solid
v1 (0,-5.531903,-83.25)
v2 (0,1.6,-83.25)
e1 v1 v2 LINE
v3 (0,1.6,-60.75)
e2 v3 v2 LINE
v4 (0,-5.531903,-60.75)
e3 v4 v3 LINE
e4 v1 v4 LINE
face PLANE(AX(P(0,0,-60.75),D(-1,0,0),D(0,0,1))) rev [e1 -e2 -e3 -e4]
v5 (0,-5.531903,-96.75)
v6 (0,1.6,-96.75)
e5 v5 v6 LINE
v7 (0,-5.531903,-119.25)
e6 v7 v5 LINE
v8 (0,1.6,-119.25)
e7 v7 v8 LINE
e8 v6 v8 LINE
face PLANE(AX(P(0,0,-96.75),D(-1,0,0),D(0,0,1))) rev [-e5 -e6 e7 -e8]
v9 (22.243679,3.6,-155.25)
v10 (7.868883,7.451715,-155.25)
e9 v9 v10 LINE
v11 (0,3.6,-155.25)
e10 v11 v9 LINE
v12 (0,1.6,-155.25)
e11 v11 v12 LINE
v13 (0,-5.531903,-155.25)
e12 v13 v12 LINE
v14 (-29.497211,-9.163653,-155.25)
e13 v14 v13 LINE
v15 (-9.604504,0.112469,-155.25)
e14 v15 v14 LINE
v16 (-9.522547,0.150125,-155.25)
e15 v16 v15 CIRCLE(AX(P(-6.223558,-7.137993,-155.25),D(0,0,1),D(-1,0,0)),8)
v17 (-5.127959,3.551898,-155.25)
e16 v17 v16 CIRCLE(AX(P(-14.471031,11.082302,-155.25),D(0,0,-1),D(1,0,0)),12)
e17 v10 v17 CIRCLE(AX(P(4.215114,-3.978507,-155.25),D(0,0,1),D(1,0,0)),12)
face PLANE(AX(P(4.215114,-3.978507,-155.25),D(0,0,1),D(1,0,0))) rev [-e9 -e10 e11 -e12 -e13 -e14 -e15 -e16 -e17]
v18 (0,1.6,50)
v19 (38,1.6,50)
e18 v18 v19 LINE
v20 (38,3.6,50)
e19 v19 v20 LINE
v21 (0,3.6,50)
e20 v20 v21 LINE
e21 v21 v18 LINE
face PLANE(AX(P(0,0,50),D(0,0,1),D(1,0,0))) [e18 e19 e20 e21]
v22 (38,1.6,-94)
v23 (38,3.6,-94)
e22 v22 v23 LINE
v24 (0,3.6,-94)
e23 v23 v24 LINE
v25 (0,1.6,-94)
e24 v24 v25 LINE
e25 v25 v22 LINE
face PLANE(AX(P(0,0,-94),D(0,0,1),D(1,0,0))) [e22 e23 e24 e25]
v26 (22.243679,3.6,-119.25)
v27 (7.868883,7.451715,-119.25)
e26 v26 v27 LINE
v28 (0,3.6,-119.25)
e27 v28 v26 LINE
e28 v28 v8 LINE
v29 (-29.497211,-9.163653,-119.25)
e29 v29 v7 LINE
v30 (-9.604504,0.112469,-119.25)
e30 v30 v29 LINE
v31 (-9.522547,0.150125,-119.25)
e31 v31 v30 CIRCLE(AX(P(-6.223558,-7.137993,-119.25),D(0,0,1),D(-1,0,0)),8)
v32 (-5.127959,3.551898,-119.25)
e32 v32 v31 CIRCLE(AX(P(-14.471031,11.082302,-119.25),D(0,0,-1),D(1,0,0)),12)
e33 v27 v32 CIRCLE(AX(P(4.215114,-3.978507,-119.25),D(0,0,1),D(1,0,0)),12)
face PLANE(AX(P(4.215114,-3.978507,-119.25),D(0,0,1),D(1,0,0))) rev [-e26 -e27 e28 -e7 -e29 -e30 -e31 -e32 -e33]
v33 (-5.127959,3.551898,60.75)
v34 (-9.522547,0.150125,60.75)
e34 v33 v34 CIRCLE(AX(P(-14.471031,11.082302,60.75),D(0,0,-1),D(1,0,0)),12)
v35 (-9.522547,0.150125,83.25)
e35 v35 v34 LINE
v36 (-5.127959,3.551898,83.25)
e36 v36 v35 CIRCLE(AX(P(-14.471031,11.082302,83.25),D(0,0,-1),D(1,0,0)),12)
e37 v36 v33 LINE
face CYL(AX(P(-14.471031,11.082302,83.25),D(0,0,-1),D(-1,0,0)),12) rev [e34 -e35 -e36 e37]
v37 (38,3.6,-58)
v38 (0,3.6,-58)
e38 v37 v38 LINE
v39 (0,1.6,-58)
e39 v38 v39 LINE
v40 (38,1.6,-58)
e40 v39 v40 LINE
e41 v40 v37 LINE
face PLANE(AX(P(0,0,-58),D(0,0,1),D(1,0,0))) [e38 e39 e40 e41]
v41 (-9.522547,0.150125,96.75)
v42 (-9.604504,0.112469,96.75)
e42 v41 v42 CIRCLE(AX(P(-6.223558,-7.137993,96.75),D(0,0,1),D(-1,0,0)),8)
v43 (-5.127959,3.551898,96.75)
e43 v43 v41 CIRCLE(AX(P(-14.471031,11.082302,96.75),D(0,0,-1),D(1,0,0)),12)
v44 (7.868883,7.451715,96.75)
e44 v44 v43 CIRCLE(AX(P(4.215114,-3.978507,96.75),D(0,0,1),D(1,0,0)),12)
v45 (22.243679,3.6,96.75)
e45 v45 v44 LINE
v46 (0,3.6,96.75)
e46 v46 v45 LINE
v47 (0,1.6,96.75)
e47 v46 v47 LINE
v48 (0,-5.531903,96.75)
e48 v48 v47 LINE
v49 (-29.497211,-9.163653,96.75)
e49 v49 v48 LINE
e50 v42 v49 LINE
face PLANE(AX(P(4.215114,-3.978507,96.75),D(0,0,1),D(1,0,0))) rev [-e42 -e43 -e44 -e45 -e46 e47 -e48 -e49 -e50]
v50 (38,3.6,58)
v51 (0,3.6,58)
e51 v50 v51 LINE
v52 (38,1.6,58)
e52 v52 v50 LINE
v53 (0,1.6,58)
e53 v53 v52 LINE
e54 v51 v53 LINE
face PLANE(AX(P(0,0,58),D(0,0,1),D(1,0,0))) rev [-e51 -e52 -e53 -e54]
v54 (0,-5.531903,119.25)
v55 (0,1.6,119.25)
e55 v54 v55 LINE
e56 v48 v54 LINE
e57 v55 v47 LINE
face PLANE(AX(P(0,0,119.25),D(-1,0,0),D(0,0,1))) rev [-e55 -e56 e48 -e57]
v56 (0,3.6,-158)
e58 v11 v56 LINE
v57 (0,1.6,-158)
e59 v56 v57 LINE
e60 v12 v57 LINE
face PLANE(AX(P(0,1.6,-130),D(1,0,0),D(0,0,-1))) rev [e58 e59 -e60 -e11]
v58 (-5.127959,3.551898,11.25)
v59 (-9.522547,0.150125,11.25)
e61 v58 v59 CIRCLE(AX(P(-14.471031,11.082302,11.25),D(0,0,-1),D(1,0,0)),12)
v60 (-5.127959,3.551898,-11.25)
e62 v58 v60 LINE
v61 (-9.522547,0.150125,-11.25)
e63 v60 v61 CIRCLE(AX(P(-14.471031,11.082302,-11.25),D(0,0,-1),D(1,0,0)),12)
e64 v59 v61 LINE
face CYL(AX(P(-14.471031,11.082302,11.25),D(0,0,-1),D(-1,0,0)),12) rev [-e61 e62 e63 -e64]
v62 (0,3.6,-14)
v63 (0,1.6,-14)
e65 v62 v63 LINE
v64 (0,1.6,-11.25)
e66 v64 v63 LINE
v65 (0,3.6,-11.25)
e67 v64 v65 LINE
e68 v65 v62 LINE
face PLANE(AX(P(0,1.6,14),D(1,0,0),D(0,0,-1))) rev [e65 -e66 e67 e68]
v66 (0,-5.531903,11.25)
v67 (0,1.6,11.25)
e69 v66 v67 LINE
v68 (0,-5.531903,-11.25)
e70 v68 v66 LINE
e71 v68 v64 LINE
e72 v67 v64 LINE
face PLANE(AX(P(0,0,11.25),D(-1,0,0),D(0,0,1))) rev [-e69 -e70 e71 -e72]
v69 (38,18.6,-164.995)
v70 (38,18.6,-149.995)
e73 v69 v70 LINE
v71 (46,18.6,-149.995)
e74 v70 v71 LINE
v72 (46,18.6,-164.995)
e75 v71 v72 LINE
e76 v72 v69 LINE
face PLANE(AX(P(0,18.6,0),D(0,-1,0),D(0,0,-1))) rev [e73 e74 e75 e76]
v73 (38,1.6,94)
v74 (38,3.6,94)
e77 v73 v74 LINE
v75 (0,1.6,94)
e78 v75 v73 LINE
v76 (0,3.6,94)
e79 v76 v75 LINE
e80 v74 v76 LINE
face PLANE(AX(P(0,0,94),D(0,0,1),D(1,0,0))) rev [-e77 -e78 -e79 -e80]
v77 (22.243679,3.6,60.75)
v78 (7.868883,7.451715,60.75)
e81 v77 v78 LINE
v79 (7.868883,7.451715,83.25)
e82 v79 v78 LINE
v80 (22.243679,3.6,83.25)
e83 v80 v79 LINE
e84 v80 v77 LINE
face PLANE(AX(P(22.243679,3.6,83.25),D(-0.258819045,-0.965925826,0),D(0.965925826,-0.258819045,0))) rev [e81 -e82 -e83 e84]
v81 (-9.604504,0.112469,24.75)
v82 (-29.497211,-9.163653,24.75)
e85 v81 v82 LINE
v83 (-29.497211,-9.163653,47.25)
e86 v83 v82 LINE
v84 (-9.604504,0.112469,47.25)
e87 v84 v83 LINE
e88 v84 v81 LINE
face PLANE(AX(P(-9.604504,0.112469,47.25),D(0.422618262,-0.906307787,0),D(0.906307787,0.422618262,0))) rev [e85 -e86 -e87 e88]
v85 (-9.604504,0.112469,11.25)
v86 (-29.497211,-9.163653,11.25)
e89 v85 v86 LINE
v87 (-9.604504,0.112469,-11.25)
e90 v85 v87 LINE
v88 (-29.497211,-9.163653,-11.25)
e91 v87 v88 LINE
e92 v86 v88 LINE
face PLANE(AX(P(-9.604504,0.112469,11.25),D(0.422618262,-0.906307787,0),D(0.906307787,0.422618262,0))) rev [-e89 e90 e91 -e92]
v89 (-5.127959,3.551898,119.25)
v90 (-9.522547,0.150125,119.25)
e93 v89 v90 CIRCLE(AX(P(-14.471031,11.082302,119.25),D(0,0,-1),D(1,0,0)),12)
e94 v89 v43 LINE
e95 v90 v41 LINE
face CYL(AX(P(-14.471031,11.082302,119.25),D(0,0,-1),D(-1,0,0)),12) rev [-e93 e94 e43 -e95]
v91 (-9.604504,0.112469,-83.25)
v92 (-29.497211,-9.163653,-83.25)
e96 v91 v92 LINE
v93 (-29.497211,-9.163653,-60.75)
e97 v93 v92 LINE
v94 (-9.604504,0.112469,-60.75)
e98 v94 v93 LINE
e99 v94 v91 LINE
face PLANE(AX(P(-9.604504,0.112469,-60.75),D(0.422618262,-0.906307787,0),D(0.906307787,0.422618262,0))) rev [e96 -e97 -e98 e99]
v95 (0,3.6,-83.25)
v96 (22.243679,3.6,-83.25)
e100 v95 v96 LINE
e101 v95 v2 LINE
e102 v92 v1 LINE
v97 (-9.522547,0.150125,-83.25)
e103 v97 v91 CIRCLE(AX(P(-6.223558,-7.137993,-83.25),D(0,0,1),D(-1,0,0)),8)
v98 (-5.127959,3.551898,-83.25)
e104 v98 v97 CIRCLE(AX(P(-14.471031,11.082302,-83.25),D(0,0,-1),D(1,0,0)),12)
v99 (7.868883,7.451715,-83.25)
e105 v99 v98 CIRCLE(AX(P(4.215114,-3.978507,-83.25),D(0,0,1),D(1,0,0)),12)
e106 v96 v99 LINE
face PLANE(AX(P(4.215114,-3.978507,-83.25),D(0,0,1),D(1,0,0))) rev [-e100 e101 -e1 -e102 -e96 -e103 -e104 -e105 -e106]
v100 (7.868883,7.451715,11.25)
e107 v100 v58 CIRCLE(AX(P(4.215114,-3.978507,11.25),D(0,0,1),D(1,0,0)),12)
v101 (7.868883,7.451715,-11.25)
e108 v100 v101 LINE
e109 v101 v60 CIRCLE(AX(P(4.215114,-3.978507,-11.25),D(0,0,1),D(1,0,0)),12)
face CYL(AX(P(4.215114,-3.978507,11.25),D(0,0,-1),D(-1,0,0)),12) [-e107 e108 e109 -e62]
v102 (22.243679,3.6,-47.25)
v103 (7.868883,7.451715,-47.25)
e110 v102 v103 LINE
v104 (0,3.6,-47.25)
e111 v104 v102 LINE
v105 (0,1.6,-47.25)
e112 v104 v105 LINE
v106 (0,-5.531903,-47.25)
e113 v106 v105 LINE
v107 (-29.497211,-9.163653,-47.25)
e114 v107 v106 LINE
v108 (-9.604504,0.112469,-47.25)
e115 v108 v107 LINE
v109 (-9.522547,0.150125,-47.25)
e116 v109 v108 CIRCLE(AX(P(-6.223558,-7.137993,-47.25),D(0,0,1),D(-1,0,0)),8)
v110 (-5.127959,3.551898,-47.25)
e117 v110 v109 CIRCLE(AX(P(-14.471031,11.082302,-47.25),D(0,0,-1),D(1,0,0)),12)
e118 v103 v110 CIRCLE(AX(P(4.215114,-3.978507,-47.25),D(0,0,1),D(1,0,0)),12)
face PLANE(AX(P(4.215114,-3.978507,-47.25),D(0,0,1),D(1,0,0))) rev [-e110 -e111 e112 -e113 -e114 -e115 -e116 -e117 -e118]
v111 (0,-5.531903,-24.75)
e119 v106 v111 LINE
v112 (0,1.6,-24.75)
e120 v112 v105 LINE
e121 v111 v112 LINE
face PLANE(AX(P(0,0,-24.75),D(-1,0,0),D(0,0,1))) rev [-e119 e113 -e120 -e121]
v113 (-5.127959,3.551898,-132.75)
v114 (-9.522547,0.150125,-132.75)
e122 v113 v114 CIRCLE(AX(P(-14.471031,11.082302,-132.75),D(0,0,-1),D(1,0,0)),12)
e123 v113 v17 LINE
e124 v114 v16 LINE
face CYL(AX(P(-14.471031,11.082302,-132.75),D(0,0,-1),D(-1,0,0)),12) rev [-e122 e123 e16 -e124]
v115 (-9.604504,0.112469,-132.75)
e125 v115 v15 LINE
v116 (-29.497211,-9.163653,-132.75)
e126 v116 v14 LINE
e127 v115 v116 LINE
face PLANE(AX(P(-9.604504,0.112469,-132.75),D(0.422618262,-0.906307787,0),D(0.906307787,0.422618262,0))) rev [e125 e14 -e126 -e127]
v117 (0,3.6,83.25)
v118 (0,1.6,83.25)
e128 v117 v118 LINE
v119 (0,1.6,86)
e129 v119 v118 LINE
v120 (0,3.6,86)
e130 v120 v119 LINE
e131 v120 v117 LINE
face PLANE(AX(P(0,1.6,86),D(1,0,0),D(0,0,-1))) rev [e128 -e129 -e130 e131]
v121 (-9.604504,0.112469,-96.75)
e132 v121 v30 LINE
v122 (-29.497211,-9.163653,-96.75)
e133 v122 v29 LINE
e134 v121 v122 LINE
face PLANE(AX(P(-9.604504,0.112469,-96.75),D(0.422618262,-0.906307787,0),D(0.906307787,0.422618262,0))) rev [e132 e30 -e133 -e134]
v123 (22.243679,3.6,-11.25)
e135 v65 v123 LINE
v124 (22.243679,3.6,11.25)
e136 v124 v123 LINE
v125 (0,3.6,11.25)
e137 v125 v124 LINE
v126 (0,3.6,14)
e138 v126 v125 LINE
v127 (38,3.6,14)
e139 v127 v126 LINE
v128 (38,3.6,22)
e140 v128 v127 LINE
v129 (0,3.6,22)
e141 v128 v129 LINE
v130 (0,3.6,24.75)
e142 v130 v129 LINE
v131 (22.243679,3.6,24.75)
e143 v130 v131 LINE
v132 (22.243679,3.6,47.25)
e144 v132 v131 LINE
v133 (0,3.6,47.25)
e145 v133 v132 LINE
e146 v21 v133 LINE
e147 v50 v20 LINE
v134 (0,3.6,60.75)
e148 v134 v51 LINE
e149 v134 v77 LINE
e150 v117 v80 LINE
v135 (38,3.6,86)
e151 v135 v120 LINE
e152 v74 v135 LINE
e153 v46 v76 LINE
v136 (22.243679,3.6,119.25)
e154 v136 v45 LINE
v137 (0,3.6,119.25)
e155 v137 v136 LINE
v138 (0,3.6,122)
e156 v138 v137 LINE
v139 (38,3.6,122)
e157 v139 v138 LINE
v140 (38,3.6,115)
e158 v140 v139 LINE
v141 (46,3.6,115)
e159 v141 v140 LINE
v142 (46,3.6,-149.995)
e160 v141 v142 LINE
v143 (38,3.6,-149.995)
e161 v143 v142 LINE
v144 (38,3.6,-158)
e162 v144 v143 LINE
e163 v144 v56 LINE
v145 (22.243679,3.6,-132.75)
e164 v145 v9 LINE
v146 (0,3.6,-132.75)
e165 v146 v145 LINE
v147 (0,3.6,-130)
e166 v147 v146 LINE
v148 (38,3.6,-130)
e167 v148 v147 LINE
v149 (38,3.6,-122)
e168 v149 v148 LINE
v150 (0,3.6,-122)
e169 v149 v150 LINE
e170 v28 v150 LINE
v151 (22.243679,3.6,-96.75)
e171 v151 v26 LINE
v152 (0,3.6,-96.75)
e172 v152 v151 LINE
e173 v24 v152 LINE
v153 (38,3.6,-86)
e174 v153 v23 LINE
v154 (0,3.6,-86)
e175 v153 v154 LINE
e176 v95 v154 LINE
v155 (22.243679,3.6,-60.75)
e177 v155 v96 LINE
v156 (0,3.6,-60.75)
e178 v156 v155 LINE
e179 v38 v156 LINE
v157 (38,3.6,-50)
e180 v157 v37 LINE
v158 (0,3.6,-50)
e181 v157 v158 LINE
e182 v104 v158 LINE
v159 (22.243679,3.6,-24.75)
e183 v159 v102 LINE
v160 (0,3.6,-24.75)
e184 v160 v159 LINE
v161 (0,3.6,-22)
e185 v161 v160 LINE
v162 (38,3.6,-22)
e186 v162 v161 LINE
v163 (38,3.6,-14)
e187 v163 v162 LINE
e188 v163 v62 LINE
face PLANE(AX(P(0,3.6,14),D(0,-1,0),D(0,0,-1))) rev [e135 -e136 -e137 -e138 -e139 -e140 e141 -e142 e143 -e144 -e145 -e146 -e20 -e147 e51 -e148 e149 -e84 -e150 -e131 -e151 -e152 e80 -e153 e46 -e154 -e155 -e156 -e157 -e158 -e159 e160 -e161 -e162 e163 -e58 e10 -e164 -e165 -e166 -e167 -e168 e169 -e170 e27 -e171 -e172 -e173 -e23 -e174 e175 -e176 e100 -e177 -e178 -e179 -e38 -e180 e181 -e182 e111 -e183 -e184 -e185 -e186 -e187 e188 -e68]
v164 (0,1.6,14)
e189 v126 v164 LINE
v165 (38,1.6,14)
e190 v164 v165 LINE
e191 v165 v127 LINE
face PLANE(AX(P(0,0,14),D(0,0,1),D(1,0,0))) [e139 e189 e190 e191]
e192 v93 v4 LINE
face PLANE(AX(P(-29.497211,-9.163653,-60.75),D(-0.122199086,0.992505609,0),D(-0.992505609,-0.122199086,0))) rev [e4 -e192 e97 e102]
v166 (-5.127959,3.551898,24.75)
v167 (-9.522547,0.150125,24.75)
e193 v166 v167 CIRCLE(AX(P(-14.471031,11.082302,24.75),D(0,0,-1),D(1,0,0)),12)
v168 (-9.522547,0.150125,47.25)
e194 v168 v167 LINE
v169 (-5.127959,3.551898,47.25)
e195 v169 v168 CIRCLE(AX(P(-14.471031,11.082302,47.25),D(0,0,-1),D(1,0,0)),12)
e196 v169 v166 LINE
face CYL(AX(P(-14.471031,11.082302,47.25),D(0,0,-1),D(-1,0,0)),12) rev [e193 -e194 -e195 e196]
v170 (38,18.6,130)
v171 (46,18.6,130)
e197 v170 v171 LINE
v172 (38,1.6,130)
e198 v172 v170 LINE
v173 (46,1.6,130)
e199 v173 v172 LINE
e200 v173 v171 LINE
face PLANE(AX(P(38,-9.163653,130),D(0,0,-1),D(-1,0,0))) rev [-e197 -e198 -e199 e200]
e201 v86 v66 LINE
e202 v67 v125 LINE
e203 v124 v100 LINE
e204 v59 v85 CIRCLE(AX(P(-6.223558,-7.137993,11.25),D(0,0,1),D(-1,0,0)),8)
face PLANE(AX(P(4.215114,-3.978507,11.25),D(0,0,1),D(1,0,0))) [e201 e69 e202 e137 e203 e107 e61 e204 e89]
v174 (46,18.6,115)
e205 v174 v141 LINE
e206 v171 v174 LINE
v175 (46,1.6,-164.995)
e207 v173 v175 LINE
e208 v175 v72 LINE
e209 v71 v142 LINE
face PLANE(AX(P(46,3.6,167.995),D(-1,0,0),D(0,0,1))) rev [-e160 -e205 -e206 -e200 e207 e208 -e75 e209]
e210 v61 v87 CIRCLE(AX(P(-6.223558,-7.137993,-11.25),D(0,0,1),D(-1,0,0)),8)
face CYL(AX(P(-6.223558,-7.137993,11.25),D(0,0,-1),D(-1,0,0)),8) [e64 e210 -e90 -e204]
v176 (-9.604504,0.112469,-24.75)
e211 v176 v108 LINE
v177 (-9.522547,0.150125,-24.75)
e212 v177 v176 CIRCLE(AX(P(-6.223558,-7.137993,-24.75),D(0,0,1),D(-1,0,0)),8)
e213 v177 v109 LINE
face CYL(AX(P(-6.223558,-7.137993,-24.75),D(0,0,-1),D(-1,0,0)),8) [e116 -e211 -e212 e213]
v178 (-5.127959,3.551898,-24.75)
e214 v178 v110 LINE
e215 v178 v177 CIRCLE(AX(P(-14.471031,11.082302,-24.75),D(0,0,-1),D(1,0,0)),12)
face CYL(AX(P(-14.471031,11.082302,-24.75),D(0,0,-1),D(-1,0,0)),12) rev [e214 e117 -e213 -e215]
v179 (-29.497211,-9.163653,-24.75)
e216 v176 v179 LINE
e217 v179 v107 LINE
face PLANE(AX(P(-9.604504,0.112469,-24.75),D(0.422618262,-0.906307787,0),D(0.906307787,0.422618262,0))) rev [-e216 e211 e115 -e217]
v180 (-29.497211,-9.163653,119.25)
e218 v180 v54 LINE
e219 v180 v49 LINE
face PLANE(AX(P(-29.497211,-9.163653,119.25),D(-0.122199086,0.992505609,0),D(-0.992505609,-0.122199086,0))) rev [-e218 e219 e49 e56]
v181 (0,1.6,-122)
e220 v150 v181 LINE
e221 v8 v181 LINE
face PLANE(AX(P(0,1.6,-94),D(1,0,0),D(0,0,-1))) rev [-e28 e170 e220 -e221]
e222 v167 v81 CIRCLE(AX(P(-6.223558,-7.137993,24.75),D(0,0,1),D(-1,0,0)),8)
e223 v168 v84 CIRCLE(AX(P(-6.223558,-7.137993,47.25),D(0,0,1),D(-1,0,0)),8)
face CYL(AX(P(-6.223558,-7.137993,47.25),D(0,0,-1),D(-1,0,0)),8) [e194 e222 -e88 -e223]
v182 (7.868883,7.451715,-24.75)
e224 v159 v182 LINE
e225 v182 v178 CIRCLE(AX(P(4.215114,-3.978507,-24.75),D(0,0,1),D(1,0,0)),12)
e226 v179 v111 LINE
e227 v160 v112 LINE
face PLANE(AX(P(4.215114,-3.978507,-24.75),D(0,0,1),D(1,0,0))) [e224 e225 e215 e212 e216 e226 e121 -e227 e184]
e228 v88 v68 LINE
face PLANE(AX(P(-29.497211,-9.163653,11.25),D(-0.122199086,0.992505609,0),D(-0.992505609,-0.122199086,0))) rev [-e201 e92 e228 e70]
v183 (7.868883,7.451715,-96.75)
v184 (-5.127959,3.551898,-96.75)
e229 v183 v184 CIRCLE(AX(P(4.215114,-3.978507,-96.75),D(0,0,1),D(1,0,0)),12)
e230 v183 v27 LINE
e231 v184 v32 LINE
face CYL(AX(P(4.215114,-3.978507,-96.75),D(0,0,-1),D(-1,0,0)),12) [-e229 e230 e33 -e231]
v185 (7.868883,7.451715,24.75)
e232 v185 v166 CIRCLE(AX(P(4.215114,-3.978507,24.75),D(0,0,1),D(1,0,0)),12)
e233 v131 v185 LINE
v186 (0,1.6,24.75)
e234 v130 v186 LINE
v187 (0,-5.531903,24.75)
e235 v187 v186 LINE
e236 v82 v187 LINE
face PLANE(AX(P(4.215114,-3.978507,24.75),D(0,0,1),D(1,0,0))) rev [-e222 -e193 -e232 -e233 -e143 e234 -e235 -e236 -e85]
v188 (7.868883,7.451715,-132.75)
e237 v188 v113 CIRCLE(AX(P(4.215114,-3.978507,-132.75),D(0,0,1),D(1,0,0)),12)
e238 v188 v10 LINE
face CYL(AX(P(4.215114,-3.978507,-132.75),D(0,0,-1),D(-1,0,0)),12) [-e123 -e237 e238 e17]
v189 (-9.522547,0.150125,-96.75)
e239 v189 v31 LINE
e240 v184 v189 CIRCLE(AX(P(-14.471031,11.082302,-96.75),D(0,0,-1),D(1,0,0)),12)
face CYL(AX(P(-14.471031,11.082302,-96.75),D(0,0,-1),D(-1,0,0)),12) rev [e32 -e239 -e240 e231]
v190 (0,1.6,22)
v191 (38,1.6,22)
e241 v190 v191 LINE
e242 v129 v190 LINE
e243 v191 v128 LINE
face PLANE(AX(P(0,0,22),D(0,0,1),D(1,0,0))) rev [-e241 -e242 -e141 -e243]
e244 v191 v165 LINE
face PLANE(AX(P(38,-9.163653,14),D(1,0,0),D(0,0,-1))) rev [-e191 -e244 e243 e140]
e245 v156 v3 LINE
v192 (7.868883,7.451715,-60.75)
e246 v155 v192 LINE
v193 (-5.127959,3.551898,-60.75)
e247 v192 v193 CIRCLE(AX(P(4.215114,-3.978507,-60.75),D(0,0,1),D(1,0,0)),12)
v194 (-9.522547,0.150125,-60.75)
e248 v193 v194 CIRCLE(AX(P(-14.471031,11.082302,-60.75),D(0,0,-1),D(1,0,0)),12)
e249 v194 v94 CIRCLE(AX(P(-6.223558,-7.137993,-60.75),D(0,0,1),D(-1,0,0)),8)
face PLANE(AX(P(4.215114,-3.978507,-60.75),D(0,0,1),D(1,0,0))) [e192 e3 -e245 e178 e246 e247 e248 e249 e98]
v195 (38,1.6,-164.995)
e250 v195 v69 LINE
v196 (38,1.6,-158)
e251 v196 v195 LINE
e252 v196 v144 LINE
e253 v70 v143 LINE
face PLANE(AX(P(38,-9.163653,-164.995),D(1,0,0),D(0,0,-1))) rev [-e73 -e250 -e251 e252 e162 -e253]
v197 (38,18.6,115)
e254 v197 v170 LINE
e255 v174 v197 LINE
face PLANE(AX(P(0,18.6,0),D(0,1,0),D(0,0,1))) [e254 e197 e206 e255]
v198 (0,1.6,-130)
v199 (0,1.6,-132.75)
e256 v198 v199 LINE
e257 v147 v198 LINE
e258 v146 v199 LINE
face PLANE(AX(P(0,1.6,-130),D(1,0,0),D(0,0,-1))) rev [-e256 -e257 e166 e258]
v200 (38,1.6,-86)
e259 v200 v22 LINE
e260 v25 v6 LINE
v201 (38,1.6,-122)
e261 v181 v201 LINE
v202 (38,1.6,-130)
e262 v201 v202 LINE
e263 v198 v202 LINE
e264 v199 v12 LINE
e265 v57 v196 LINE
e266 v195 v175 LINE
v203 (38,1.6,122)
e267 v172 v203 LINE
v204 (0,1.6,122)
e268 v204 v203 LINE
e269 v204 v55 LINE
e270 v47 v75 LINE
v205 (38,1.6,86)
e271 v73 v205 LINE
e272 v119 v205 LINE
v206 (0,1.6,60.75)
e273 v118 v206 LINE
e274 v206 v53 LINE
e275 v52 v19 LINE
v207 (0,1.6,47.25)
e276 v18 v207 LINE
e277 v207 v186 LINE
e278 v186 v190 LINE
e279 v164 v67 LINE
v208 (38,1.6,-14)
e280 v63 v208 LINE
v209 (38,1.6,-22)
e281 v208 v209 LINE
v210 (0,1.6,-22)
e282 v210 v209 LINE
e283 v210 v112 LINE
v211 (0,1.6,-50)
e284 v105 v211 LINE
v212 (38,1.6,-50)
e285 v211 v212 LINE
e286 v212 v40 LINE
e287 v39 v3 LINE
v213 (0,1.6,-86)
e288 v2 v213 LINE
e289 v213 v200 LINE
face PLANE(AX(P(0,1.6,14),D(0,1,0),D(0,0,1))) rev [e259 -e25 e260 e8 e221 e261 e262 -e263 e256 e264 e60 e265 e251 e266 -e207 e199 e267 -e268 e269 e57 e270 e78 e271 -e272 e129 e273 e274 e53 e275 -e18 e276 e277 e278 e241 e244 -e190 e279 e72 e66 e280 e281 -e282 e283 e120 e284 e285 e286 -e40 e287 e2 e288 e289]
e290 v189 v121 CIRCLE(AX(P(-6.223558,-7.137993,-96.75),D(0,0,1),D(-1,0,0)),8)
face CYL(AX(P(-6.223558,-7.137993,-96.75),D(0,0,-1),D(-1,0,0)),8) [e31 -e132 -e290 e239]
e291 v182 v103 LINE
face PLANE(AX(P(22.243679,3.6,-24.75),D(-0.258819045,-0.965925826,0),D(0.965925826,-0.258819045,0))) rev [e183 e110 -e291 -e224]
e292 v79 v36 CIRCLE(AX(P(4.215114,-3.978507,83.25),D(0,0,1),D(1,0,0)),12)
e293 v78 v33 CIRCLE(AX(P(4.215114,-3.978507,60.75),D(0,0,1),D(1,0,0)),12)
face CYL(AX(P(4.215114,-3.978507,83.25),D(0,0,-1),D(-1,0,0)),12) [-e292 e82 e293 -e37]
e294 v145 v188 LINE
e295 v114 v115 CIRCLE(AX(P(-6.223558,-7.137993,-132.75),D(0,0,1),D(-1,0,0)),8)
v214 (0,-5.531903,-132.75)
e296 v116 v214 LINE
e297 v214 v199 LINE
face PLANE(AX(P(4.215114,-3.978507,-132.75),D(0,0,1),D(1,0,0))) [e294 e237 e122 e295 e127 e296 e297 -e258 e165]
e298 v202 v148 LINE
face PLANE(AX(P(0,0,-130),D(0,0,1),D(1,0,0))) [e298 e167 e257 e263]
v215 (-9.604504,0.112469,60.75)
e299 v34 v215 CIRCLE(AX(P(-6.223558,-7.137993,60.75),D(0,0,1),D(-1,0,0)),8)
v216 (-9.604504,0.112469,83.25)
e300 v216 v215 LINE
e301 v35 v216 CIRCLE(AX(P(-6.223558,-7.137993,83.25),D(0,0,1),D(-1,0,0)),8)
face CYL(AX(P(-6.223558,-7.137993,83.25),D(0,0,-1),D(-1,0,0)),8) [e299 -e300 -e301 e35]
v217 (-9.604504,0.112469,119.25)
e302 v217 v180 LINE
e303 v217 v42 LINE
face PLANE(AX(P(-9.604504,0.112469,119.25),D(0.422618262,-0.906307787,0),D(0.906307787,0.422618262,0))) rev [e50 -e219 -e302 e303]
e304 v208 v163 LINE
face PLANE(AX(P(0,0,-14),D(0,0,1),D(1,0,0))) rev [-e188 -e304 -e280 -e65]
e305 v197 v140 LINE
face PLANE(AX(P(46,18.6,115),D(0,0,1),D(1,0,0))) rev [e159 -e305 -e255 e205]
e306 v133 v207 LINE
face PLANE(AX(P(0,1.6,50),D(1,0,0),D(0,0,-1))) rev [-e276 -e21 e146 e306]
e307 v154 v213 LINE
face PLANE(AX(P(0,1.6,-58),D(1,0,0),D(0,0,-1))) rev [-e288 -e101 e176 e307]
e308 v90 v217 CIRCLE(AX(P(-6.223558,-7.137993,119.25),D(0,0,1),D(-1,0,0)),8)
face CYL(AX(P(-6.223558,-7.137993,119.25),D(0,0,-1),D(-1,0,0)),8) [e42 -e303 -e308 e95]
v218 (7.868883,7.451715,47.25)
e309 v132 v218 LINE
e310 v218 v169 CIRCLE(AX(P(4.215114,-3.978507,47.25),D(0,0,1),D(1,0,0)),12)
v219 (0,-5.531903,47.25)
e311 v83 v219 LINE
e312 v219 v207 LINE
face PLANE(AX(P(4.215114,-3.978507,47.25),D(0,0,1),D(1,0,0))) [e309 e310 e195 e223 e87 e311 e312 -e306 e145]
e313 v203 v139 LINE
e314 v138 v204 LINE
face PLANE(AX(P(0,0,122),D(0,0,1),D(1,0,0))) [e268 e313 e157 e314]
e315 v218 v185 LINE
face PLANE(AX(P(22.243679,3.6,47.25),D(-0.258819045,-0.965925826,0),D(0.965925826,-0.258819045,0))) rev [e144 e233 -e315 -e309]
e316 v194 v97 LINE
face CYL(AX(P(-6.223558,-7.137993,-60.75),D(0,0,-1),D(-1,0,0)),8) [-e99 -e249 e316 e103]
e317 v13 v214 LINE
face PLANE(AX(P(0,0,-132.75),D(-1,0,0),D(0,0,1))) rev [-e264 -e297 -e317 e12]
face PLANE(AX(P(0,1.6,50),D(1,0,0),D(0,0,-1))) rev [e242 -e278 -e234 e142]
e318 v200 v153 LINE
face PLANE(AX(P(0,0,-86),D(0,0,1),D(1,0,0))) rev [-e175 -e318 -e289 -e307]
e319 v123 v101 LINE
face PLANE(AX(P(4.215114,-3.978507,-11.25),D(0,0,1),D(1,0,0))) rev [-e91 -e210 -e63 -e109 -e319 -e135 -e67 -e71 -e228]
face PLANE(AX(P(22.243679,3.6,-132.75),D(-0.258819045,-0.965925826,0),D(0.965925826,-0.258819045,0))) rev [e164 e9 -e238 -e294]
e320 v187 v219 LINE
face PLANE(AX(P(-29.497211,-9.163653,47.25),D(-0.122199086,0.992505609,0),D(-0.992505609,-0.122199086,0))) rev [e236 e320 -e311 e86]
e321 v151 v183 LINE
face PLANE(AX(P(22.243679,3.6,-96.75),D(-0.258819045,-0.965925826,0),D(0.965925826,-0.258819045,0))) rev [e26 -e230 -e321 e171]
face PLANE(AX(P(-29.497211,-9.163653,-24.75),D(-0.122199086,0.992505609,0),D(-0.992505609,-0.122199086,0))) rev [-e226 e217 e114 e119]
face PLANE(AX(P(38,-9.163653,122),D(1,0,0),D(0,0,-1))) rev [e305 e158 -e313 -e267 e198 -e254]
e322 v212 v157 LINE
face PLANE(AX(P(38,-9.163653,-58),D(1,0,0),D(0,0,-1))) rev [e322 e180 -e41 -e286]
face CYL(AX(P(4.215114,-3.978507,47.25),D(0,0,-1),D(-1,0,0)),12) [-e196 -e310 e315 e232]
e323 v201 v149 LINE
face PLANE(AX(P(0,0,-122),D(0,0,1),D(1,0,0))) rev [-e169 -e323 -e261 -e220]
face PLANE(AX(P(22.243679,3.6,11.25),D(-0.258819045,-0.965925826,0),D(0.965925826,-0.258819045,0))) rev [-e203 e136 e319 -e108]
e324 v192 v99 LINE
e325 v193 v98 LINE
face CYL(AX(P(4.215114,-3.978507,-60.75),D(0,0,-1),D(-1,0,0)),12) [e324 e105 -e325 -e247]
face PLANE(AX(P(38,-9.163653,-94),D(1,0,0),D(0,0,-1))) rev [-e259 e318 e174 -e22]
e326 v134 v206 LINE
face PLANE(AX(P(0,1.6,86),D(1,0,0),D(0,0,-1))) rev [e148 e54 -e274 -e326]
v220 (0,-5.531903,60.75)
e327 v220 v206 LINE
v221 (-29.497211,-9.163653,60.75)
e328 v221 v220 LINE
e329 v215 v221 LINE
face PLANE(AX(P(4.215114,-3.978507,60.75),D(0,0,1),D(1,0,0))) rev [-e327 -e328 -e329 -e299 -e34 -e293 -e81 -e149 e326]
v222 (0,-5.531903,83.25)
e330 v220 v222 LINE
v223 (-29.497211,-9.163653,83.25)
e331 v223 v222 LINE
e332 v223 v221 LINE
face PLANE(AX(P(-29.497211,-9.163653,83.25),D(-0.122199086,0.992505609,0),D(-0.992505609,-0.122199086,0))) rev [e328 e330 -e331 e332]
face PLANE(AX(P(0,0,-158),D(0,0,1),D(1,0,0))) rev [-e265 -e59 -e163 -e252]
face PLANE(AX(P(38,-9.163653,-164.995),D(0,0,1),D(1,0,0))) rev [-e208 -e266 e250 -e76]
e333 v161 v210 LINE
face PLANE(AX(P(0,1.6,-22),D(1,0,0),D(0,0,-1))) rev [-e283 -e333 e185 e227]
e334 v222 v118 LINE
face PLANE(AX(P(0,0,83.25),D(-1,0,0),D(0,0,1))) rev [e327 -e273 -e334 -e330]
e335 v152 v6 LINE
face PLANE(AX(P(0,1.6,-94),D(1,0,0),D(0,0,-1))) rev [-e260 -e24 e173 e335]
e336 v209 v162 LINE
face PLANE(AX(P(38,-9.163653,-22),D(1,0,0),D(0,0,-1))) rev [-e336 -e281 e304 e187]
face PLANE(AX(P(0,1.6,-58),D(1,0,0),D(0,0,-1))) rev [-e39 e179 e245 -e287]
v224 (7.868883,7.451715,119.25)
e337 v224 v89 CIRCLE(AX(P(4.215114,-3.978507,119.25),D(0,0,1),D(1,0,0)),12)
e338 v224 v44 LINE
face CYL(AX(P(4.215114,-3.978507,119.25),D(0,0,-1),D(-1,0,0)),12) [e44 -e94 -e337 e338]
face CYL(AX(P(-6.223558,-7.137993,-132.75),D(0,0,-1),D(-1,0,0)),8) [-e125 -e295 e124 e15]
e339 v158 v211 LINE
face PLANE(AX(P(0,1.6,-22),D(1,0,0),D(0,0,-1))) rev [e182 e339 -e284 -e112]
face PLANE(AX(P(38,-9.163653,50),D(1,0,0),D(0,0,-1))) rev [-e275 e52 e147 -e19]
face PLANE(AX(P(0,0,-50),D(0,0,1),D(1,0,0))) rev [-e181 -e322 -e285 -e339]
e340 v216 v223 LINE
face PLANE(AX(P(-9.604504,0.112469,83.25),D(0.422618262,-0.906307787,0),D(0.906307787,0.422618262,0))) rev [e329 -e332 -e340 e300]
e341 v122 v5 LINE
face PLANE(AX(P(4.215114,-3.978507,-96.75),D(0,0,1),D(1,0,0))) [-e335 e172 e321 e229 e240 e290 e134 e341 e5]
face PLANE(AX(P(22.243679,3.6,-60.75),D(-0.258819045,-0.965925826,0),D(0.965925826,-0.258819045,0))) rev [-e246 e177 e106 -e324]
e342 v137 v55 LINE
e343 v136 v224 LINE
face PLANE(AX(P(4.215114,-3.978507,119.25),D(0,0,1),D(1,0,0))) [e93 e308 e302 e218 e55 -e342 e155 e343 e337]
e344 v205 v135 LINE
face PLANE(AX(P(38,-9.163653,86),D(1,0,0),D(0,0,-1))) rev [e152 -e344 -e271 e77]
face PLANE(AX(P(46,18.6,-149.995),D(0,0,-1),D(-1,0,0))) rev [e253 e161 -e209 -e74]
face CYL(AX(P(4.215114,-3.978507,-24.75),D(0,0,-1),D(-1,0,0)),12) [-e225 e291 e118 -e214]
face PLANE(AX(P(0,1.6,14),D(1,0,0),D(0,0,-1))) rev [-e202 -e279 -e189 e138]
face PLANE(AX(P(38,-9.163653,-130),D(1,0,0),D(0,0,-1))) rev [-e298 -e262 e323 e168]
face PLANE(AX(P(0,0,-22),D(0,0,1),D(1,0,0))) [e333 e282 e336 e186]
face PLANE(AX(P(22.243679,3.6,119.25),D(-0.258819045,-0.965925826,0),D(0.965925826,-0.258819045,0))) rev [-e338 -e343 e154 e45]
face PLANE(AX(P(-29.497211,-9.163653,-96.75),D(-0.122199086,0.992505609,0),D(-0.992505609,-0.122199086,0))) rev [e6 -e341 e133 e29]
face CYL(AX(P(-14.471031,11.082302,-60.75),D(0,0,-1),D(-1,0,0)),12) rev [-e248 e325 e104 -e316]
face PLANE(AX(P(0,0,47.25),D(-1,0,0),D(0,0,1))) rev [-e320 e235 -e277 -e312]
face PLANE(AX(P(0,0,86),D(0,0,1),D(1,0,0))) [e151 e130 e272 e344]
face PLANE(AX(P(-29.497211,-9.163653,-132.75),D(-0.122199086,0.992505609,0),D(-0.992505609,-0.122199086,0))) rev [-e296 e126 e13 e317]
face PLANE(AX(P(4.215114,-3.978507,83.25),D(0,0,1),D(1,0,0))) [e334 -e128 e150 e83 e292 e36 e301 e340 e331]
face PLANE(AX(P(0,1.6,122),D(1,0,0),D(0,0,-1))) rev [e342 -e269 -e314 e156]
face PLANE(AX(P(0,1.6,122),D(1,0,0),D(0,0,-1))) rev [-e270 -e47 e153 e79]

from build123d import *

# Parameters (mm, degrees)
EXTRUDE1_DEPTH       = 11.25
SKETCH3_W            = 22.5
SKETCH3_H            = 5.033767183
EXTRUDE2_DEPTH       = 10
EXTRUDE3_DEPTH       = 14
SKETCH5_W            = 10
SKETCH5_H            = 2
EXTRUDE4_DEPTH       = 167.995
LPATTERN1_OUTLINE_W  = 2
LPATTERN1_OUTLINE_H  = 28
LPATTERN1_DEPTH      = 36
EXTRUDE6_DEPTH       = 175.64601587
EXTRUDE6_DEPTH_BACK  = 175.64601587
SKETCH7_W            = 3
SKETCH7_H            = 2
EXTRUDE7_DEPTH       = 36
LPATTERN2_COUNT      = 4
LPATTERN2_PITCH      = 36
LPATTERN2_COUNT_DIR2 = 5
LPATTERN2_PITCH_DIR2 = 36
SKETCH8_W            = 2
SKETCH8_H            = 6.995
SKETCH8_H_2          = 8
EXTRUDE8_DEPTH       = 175.64601587
EXTRUDE9_DEPTH       = 175.64601587
SKETCH10_W           = 7.252078552
SKETCH10_H           = 8.610092753
EXTRUDE10_DEPTH      = 290.080499228
SKETCH11_W           = 8
SKETCH11_H           = 15
EXTRUDE11_DEPTH      = 15


# Read off the part's stored shape, not the designer's step: LPattern1
with BuildPart() as part:
    # Sketch1 → Extrude1 (new, symmetric)
    with BuildSketch(Plane.XY):
        with BuildLine():
            Line((22.243678564, 3.6), (7.8688831, 7.451714836))
            ThreePointArc((7.8688831, 7.451714836), (0.766318838, 7.515222423), (-5.127958891, 3.551897764))
            ThreePointArc((-5.127958891, 3.551897764), (-7.125613619, 1.593106665), (-9.522547255, 0.150124985))
            ThreePointArc((-9.522547255, 0.150124985), (-9.563578628, 0.131412483), (-9.604503865, 0.11246898))
            Line((-9.604503865, 0.11246898), (-29.497211353, -9.163652863))
            Line((-29.497211353, -9.163652863), (4.045876789, -5.033767183))
            Line((4.045876789, -5.033767183), (4.045876789, 0))
            Line((4.045876789, 0), (0, 0))
            Line((0, 0), (0, 3.6))
            Line((0, 3.6), (22.243678564, 3.6))
        make_face()
    extrude1 = extrude(amount=EXTRUDE1_DEPTH, both=True)

    # Sketch3 → Extrude2 (cut)
    with BuildSketch(Plane(origin=(4.045876789, 0, 0), x_dir=(0, 0, -1), z_dir=(1, 0, 0))):
        with Locations((0, -2.516883592)):
            Rectangle(SKETCH3_W, SKETCH3_H)
    extrude(amount=-EXTRUDE2_DEPTH, mode=Mode.SUBTRACT)

    # Sketch4 → Extrude3 (add, symmetric)
    with BuildSketch(Plane.XY):
        Polygon((0, 1.6), (0, 3.6), (22.243678564, 3.6), (36, 3.6), (36, 1.6), align=None)
    extrude(amount=EXTRUDE3_DEPTH, both=True)

    # Sketch5 → Extrude4 (add, symmetric)
    with BuildSketch(Plane.XY):
        with Locations((41, 2.6)):
            Rectangle(SKETCH5_W, SKETCH5_H)
    extrude(amount=EXTRUDE4_DEPTH, both=True)

    # LPattern1 outline → LPattern1 (add)
    with BuildSketch(Plane.YZ):
        with Locations((2.6, -144)):
            Rectangle(LPATTERN1_OUTLINE_W, LPATTERN1_OUTLINE_H)
        with Locations((2.6, -108)):
            Rectangle(LPATTERN1_OUTLINE_W, LPATTERN1_OUTLINE_H)
        with Locations((2.6, -72)):
            Rectangle(LPATTERN1_OUTLINE_W, LPATTERN1_OUTLINE_H)
        with Locations((2.6, -36)):
            Rectangle(LPATTERN1_OUTLINE_W, LPATTERN1_OUTLINE_H)
        with Locations((2.6, 36)):
            Rectangle(LPATTERN1_OUTLINE_W, LPATTERN1_OUTLINE_H)
        with Locations((2.6, 72)):
            Rectangle(LPATTERN1_OUTLINE_W, LPATTERN1_OUTLINE_H)
        with Locations((2.6, 108)):
            Rectangle(LPATTERN1_OUTLINE_W, LPATTERN1_OUTLINE_H)
        with Locations((2.6, 144)):
            Rectangle(LPATTERN1_OUTLINE_W, LPATTERN1_OUTLINE_H)
    extrude(amount=LPATTERN1_DEPTH)

    # Sketch6 → Extrude6 (cut, two sides: drawn at the far end of the back side and taken through both)
    with BuildSketch(Plane(origin=(0, 3.6, 0), x_dir=(1, 0, 0), z_dir=(0, 1, 0)).offset(-EXTRUDE6_DEPTH_BACK)):
        Polygon((-630.637797583, -133), (0, -133), (46, -133), (676.637797583, -133), (676.637797583, -1394.275595165), (-630.637797583, -1394.275595165), align=None)
    extrude(amount=EXTRUDE6_DEPTH + EXTRUDE6_DEPTH_BACK, mode=Mode.SUBTRACT)

    # Sketch7 → Extrude7 (add)
    with BuildSketch(Plane.ZY.offset(-36)):
        with Locations((-166.495, 2.6)):
            Rectangle(SKETCH7_W, SKETCH7_H)
    extrude(amount=EXTRUDE7_DEPTH)

    # LPattern2: Extrude1 4 × 5
    with Locations(*[Vector(0, 0, 1) * (i * LPATTERN2_PITCH) + Vector(0, 0, -1) * (j * LPATTERN2_PITCH_DIR2) for i in range(LPATTERN2_COUNT) for j in range(LPATTERN2_COUNT_DIR2) if (i, j) != (0, 0)]):
        add(extrude1)

    # Sketch8 → Extrude8 (cut, through all)
    with BuildSketch(Plane(origin=(0, 3.6, 0), x_dir=(1, 0, 0), z_dir=(0, 1, 0))):
        with Locations((37, 161.4975)):
            Rectangle(SKETCH8_W, SKETCH8_H)
        with Locations((37, 126)):
            Rectangle(SKETCH8_W, SKETCH8_H_2)
        with Locations((37, 90)):
            Rectangle(SKETCH8_W, SKETCH8_H_2)
        with Locations((37, 54)):
            Rectangle(SKETCH8_W, SKETCH8_H_2)
        with Locations((37, 18)):
            Rectangle(SKETCH8_W, SKETCH8_H_2)
        with Locations((37, -18)):
            Rectangle(SKETCH8_W, SKETCH8_H_2)
        with Locations((37, -54)):
            Rectangle(SKETCH8_W, SKETCH8_H_2)
        with Locations((37, -90)):
            Rectangle(SKETCH8_W, SKETCH8_H_2)
        with Locations((37, -126)):
            Rectangle(SKETCH8_W, SKETCH8_H_2)
    extrude(amount=-EXTRUDE8_DEPTH, mode=Mode.SUBTRACT)

    # Sketch9 → Extrude9 (cut, through all)
    with BuildSketch(Plane(origin=(0, 3.6, 0), x_dir=(1, 0, 0), z_dir=(0, 1, 0))):
        Polygon((38, 164.995), (46, 164.995), (46, 167.995), (0, 167.995), (0, 164.995), align=None)
        Polygon((38, -130), (46, -130), (46, -133), (0, -133), (0, -130), align=None)
    extrude(amount=-EXTRUDE9_DEPTH, mode=Mode.SUBTRACT)

    # Sketch10 → Extrude10 (cut, through all)
    with BuildSketch(Plane(origin=(0, 0, -155.25), x_dir=(-1, 0, 0), z_dir=(0, 0, -1))):
        with Locations((-3.626039276, -2.705046377)):
            Rectangle(SKETCH10_W, SKETCH10_H)
    extrude(amount=-EXTRUDE10_DEPTH, mode=Mode.SUBTRACT)

    # Sketch11 → Extrude11 (add)
    with BuildSketch(Plane(origin=(0, 3.6, 0), x_dir=(1, 0, 0), z_dir=(0, 1, 0))):
        with Locations((42, 157.495)):
            Rectangle(SKETCH11_W, SKETCH11_H)
        with Locations((42, -122.5)):
            Rectangle(SKETCH11_W, SKETCH11_H)
    extrude(amount=EXTRUDE11_DEPTH)


solid = part.part
